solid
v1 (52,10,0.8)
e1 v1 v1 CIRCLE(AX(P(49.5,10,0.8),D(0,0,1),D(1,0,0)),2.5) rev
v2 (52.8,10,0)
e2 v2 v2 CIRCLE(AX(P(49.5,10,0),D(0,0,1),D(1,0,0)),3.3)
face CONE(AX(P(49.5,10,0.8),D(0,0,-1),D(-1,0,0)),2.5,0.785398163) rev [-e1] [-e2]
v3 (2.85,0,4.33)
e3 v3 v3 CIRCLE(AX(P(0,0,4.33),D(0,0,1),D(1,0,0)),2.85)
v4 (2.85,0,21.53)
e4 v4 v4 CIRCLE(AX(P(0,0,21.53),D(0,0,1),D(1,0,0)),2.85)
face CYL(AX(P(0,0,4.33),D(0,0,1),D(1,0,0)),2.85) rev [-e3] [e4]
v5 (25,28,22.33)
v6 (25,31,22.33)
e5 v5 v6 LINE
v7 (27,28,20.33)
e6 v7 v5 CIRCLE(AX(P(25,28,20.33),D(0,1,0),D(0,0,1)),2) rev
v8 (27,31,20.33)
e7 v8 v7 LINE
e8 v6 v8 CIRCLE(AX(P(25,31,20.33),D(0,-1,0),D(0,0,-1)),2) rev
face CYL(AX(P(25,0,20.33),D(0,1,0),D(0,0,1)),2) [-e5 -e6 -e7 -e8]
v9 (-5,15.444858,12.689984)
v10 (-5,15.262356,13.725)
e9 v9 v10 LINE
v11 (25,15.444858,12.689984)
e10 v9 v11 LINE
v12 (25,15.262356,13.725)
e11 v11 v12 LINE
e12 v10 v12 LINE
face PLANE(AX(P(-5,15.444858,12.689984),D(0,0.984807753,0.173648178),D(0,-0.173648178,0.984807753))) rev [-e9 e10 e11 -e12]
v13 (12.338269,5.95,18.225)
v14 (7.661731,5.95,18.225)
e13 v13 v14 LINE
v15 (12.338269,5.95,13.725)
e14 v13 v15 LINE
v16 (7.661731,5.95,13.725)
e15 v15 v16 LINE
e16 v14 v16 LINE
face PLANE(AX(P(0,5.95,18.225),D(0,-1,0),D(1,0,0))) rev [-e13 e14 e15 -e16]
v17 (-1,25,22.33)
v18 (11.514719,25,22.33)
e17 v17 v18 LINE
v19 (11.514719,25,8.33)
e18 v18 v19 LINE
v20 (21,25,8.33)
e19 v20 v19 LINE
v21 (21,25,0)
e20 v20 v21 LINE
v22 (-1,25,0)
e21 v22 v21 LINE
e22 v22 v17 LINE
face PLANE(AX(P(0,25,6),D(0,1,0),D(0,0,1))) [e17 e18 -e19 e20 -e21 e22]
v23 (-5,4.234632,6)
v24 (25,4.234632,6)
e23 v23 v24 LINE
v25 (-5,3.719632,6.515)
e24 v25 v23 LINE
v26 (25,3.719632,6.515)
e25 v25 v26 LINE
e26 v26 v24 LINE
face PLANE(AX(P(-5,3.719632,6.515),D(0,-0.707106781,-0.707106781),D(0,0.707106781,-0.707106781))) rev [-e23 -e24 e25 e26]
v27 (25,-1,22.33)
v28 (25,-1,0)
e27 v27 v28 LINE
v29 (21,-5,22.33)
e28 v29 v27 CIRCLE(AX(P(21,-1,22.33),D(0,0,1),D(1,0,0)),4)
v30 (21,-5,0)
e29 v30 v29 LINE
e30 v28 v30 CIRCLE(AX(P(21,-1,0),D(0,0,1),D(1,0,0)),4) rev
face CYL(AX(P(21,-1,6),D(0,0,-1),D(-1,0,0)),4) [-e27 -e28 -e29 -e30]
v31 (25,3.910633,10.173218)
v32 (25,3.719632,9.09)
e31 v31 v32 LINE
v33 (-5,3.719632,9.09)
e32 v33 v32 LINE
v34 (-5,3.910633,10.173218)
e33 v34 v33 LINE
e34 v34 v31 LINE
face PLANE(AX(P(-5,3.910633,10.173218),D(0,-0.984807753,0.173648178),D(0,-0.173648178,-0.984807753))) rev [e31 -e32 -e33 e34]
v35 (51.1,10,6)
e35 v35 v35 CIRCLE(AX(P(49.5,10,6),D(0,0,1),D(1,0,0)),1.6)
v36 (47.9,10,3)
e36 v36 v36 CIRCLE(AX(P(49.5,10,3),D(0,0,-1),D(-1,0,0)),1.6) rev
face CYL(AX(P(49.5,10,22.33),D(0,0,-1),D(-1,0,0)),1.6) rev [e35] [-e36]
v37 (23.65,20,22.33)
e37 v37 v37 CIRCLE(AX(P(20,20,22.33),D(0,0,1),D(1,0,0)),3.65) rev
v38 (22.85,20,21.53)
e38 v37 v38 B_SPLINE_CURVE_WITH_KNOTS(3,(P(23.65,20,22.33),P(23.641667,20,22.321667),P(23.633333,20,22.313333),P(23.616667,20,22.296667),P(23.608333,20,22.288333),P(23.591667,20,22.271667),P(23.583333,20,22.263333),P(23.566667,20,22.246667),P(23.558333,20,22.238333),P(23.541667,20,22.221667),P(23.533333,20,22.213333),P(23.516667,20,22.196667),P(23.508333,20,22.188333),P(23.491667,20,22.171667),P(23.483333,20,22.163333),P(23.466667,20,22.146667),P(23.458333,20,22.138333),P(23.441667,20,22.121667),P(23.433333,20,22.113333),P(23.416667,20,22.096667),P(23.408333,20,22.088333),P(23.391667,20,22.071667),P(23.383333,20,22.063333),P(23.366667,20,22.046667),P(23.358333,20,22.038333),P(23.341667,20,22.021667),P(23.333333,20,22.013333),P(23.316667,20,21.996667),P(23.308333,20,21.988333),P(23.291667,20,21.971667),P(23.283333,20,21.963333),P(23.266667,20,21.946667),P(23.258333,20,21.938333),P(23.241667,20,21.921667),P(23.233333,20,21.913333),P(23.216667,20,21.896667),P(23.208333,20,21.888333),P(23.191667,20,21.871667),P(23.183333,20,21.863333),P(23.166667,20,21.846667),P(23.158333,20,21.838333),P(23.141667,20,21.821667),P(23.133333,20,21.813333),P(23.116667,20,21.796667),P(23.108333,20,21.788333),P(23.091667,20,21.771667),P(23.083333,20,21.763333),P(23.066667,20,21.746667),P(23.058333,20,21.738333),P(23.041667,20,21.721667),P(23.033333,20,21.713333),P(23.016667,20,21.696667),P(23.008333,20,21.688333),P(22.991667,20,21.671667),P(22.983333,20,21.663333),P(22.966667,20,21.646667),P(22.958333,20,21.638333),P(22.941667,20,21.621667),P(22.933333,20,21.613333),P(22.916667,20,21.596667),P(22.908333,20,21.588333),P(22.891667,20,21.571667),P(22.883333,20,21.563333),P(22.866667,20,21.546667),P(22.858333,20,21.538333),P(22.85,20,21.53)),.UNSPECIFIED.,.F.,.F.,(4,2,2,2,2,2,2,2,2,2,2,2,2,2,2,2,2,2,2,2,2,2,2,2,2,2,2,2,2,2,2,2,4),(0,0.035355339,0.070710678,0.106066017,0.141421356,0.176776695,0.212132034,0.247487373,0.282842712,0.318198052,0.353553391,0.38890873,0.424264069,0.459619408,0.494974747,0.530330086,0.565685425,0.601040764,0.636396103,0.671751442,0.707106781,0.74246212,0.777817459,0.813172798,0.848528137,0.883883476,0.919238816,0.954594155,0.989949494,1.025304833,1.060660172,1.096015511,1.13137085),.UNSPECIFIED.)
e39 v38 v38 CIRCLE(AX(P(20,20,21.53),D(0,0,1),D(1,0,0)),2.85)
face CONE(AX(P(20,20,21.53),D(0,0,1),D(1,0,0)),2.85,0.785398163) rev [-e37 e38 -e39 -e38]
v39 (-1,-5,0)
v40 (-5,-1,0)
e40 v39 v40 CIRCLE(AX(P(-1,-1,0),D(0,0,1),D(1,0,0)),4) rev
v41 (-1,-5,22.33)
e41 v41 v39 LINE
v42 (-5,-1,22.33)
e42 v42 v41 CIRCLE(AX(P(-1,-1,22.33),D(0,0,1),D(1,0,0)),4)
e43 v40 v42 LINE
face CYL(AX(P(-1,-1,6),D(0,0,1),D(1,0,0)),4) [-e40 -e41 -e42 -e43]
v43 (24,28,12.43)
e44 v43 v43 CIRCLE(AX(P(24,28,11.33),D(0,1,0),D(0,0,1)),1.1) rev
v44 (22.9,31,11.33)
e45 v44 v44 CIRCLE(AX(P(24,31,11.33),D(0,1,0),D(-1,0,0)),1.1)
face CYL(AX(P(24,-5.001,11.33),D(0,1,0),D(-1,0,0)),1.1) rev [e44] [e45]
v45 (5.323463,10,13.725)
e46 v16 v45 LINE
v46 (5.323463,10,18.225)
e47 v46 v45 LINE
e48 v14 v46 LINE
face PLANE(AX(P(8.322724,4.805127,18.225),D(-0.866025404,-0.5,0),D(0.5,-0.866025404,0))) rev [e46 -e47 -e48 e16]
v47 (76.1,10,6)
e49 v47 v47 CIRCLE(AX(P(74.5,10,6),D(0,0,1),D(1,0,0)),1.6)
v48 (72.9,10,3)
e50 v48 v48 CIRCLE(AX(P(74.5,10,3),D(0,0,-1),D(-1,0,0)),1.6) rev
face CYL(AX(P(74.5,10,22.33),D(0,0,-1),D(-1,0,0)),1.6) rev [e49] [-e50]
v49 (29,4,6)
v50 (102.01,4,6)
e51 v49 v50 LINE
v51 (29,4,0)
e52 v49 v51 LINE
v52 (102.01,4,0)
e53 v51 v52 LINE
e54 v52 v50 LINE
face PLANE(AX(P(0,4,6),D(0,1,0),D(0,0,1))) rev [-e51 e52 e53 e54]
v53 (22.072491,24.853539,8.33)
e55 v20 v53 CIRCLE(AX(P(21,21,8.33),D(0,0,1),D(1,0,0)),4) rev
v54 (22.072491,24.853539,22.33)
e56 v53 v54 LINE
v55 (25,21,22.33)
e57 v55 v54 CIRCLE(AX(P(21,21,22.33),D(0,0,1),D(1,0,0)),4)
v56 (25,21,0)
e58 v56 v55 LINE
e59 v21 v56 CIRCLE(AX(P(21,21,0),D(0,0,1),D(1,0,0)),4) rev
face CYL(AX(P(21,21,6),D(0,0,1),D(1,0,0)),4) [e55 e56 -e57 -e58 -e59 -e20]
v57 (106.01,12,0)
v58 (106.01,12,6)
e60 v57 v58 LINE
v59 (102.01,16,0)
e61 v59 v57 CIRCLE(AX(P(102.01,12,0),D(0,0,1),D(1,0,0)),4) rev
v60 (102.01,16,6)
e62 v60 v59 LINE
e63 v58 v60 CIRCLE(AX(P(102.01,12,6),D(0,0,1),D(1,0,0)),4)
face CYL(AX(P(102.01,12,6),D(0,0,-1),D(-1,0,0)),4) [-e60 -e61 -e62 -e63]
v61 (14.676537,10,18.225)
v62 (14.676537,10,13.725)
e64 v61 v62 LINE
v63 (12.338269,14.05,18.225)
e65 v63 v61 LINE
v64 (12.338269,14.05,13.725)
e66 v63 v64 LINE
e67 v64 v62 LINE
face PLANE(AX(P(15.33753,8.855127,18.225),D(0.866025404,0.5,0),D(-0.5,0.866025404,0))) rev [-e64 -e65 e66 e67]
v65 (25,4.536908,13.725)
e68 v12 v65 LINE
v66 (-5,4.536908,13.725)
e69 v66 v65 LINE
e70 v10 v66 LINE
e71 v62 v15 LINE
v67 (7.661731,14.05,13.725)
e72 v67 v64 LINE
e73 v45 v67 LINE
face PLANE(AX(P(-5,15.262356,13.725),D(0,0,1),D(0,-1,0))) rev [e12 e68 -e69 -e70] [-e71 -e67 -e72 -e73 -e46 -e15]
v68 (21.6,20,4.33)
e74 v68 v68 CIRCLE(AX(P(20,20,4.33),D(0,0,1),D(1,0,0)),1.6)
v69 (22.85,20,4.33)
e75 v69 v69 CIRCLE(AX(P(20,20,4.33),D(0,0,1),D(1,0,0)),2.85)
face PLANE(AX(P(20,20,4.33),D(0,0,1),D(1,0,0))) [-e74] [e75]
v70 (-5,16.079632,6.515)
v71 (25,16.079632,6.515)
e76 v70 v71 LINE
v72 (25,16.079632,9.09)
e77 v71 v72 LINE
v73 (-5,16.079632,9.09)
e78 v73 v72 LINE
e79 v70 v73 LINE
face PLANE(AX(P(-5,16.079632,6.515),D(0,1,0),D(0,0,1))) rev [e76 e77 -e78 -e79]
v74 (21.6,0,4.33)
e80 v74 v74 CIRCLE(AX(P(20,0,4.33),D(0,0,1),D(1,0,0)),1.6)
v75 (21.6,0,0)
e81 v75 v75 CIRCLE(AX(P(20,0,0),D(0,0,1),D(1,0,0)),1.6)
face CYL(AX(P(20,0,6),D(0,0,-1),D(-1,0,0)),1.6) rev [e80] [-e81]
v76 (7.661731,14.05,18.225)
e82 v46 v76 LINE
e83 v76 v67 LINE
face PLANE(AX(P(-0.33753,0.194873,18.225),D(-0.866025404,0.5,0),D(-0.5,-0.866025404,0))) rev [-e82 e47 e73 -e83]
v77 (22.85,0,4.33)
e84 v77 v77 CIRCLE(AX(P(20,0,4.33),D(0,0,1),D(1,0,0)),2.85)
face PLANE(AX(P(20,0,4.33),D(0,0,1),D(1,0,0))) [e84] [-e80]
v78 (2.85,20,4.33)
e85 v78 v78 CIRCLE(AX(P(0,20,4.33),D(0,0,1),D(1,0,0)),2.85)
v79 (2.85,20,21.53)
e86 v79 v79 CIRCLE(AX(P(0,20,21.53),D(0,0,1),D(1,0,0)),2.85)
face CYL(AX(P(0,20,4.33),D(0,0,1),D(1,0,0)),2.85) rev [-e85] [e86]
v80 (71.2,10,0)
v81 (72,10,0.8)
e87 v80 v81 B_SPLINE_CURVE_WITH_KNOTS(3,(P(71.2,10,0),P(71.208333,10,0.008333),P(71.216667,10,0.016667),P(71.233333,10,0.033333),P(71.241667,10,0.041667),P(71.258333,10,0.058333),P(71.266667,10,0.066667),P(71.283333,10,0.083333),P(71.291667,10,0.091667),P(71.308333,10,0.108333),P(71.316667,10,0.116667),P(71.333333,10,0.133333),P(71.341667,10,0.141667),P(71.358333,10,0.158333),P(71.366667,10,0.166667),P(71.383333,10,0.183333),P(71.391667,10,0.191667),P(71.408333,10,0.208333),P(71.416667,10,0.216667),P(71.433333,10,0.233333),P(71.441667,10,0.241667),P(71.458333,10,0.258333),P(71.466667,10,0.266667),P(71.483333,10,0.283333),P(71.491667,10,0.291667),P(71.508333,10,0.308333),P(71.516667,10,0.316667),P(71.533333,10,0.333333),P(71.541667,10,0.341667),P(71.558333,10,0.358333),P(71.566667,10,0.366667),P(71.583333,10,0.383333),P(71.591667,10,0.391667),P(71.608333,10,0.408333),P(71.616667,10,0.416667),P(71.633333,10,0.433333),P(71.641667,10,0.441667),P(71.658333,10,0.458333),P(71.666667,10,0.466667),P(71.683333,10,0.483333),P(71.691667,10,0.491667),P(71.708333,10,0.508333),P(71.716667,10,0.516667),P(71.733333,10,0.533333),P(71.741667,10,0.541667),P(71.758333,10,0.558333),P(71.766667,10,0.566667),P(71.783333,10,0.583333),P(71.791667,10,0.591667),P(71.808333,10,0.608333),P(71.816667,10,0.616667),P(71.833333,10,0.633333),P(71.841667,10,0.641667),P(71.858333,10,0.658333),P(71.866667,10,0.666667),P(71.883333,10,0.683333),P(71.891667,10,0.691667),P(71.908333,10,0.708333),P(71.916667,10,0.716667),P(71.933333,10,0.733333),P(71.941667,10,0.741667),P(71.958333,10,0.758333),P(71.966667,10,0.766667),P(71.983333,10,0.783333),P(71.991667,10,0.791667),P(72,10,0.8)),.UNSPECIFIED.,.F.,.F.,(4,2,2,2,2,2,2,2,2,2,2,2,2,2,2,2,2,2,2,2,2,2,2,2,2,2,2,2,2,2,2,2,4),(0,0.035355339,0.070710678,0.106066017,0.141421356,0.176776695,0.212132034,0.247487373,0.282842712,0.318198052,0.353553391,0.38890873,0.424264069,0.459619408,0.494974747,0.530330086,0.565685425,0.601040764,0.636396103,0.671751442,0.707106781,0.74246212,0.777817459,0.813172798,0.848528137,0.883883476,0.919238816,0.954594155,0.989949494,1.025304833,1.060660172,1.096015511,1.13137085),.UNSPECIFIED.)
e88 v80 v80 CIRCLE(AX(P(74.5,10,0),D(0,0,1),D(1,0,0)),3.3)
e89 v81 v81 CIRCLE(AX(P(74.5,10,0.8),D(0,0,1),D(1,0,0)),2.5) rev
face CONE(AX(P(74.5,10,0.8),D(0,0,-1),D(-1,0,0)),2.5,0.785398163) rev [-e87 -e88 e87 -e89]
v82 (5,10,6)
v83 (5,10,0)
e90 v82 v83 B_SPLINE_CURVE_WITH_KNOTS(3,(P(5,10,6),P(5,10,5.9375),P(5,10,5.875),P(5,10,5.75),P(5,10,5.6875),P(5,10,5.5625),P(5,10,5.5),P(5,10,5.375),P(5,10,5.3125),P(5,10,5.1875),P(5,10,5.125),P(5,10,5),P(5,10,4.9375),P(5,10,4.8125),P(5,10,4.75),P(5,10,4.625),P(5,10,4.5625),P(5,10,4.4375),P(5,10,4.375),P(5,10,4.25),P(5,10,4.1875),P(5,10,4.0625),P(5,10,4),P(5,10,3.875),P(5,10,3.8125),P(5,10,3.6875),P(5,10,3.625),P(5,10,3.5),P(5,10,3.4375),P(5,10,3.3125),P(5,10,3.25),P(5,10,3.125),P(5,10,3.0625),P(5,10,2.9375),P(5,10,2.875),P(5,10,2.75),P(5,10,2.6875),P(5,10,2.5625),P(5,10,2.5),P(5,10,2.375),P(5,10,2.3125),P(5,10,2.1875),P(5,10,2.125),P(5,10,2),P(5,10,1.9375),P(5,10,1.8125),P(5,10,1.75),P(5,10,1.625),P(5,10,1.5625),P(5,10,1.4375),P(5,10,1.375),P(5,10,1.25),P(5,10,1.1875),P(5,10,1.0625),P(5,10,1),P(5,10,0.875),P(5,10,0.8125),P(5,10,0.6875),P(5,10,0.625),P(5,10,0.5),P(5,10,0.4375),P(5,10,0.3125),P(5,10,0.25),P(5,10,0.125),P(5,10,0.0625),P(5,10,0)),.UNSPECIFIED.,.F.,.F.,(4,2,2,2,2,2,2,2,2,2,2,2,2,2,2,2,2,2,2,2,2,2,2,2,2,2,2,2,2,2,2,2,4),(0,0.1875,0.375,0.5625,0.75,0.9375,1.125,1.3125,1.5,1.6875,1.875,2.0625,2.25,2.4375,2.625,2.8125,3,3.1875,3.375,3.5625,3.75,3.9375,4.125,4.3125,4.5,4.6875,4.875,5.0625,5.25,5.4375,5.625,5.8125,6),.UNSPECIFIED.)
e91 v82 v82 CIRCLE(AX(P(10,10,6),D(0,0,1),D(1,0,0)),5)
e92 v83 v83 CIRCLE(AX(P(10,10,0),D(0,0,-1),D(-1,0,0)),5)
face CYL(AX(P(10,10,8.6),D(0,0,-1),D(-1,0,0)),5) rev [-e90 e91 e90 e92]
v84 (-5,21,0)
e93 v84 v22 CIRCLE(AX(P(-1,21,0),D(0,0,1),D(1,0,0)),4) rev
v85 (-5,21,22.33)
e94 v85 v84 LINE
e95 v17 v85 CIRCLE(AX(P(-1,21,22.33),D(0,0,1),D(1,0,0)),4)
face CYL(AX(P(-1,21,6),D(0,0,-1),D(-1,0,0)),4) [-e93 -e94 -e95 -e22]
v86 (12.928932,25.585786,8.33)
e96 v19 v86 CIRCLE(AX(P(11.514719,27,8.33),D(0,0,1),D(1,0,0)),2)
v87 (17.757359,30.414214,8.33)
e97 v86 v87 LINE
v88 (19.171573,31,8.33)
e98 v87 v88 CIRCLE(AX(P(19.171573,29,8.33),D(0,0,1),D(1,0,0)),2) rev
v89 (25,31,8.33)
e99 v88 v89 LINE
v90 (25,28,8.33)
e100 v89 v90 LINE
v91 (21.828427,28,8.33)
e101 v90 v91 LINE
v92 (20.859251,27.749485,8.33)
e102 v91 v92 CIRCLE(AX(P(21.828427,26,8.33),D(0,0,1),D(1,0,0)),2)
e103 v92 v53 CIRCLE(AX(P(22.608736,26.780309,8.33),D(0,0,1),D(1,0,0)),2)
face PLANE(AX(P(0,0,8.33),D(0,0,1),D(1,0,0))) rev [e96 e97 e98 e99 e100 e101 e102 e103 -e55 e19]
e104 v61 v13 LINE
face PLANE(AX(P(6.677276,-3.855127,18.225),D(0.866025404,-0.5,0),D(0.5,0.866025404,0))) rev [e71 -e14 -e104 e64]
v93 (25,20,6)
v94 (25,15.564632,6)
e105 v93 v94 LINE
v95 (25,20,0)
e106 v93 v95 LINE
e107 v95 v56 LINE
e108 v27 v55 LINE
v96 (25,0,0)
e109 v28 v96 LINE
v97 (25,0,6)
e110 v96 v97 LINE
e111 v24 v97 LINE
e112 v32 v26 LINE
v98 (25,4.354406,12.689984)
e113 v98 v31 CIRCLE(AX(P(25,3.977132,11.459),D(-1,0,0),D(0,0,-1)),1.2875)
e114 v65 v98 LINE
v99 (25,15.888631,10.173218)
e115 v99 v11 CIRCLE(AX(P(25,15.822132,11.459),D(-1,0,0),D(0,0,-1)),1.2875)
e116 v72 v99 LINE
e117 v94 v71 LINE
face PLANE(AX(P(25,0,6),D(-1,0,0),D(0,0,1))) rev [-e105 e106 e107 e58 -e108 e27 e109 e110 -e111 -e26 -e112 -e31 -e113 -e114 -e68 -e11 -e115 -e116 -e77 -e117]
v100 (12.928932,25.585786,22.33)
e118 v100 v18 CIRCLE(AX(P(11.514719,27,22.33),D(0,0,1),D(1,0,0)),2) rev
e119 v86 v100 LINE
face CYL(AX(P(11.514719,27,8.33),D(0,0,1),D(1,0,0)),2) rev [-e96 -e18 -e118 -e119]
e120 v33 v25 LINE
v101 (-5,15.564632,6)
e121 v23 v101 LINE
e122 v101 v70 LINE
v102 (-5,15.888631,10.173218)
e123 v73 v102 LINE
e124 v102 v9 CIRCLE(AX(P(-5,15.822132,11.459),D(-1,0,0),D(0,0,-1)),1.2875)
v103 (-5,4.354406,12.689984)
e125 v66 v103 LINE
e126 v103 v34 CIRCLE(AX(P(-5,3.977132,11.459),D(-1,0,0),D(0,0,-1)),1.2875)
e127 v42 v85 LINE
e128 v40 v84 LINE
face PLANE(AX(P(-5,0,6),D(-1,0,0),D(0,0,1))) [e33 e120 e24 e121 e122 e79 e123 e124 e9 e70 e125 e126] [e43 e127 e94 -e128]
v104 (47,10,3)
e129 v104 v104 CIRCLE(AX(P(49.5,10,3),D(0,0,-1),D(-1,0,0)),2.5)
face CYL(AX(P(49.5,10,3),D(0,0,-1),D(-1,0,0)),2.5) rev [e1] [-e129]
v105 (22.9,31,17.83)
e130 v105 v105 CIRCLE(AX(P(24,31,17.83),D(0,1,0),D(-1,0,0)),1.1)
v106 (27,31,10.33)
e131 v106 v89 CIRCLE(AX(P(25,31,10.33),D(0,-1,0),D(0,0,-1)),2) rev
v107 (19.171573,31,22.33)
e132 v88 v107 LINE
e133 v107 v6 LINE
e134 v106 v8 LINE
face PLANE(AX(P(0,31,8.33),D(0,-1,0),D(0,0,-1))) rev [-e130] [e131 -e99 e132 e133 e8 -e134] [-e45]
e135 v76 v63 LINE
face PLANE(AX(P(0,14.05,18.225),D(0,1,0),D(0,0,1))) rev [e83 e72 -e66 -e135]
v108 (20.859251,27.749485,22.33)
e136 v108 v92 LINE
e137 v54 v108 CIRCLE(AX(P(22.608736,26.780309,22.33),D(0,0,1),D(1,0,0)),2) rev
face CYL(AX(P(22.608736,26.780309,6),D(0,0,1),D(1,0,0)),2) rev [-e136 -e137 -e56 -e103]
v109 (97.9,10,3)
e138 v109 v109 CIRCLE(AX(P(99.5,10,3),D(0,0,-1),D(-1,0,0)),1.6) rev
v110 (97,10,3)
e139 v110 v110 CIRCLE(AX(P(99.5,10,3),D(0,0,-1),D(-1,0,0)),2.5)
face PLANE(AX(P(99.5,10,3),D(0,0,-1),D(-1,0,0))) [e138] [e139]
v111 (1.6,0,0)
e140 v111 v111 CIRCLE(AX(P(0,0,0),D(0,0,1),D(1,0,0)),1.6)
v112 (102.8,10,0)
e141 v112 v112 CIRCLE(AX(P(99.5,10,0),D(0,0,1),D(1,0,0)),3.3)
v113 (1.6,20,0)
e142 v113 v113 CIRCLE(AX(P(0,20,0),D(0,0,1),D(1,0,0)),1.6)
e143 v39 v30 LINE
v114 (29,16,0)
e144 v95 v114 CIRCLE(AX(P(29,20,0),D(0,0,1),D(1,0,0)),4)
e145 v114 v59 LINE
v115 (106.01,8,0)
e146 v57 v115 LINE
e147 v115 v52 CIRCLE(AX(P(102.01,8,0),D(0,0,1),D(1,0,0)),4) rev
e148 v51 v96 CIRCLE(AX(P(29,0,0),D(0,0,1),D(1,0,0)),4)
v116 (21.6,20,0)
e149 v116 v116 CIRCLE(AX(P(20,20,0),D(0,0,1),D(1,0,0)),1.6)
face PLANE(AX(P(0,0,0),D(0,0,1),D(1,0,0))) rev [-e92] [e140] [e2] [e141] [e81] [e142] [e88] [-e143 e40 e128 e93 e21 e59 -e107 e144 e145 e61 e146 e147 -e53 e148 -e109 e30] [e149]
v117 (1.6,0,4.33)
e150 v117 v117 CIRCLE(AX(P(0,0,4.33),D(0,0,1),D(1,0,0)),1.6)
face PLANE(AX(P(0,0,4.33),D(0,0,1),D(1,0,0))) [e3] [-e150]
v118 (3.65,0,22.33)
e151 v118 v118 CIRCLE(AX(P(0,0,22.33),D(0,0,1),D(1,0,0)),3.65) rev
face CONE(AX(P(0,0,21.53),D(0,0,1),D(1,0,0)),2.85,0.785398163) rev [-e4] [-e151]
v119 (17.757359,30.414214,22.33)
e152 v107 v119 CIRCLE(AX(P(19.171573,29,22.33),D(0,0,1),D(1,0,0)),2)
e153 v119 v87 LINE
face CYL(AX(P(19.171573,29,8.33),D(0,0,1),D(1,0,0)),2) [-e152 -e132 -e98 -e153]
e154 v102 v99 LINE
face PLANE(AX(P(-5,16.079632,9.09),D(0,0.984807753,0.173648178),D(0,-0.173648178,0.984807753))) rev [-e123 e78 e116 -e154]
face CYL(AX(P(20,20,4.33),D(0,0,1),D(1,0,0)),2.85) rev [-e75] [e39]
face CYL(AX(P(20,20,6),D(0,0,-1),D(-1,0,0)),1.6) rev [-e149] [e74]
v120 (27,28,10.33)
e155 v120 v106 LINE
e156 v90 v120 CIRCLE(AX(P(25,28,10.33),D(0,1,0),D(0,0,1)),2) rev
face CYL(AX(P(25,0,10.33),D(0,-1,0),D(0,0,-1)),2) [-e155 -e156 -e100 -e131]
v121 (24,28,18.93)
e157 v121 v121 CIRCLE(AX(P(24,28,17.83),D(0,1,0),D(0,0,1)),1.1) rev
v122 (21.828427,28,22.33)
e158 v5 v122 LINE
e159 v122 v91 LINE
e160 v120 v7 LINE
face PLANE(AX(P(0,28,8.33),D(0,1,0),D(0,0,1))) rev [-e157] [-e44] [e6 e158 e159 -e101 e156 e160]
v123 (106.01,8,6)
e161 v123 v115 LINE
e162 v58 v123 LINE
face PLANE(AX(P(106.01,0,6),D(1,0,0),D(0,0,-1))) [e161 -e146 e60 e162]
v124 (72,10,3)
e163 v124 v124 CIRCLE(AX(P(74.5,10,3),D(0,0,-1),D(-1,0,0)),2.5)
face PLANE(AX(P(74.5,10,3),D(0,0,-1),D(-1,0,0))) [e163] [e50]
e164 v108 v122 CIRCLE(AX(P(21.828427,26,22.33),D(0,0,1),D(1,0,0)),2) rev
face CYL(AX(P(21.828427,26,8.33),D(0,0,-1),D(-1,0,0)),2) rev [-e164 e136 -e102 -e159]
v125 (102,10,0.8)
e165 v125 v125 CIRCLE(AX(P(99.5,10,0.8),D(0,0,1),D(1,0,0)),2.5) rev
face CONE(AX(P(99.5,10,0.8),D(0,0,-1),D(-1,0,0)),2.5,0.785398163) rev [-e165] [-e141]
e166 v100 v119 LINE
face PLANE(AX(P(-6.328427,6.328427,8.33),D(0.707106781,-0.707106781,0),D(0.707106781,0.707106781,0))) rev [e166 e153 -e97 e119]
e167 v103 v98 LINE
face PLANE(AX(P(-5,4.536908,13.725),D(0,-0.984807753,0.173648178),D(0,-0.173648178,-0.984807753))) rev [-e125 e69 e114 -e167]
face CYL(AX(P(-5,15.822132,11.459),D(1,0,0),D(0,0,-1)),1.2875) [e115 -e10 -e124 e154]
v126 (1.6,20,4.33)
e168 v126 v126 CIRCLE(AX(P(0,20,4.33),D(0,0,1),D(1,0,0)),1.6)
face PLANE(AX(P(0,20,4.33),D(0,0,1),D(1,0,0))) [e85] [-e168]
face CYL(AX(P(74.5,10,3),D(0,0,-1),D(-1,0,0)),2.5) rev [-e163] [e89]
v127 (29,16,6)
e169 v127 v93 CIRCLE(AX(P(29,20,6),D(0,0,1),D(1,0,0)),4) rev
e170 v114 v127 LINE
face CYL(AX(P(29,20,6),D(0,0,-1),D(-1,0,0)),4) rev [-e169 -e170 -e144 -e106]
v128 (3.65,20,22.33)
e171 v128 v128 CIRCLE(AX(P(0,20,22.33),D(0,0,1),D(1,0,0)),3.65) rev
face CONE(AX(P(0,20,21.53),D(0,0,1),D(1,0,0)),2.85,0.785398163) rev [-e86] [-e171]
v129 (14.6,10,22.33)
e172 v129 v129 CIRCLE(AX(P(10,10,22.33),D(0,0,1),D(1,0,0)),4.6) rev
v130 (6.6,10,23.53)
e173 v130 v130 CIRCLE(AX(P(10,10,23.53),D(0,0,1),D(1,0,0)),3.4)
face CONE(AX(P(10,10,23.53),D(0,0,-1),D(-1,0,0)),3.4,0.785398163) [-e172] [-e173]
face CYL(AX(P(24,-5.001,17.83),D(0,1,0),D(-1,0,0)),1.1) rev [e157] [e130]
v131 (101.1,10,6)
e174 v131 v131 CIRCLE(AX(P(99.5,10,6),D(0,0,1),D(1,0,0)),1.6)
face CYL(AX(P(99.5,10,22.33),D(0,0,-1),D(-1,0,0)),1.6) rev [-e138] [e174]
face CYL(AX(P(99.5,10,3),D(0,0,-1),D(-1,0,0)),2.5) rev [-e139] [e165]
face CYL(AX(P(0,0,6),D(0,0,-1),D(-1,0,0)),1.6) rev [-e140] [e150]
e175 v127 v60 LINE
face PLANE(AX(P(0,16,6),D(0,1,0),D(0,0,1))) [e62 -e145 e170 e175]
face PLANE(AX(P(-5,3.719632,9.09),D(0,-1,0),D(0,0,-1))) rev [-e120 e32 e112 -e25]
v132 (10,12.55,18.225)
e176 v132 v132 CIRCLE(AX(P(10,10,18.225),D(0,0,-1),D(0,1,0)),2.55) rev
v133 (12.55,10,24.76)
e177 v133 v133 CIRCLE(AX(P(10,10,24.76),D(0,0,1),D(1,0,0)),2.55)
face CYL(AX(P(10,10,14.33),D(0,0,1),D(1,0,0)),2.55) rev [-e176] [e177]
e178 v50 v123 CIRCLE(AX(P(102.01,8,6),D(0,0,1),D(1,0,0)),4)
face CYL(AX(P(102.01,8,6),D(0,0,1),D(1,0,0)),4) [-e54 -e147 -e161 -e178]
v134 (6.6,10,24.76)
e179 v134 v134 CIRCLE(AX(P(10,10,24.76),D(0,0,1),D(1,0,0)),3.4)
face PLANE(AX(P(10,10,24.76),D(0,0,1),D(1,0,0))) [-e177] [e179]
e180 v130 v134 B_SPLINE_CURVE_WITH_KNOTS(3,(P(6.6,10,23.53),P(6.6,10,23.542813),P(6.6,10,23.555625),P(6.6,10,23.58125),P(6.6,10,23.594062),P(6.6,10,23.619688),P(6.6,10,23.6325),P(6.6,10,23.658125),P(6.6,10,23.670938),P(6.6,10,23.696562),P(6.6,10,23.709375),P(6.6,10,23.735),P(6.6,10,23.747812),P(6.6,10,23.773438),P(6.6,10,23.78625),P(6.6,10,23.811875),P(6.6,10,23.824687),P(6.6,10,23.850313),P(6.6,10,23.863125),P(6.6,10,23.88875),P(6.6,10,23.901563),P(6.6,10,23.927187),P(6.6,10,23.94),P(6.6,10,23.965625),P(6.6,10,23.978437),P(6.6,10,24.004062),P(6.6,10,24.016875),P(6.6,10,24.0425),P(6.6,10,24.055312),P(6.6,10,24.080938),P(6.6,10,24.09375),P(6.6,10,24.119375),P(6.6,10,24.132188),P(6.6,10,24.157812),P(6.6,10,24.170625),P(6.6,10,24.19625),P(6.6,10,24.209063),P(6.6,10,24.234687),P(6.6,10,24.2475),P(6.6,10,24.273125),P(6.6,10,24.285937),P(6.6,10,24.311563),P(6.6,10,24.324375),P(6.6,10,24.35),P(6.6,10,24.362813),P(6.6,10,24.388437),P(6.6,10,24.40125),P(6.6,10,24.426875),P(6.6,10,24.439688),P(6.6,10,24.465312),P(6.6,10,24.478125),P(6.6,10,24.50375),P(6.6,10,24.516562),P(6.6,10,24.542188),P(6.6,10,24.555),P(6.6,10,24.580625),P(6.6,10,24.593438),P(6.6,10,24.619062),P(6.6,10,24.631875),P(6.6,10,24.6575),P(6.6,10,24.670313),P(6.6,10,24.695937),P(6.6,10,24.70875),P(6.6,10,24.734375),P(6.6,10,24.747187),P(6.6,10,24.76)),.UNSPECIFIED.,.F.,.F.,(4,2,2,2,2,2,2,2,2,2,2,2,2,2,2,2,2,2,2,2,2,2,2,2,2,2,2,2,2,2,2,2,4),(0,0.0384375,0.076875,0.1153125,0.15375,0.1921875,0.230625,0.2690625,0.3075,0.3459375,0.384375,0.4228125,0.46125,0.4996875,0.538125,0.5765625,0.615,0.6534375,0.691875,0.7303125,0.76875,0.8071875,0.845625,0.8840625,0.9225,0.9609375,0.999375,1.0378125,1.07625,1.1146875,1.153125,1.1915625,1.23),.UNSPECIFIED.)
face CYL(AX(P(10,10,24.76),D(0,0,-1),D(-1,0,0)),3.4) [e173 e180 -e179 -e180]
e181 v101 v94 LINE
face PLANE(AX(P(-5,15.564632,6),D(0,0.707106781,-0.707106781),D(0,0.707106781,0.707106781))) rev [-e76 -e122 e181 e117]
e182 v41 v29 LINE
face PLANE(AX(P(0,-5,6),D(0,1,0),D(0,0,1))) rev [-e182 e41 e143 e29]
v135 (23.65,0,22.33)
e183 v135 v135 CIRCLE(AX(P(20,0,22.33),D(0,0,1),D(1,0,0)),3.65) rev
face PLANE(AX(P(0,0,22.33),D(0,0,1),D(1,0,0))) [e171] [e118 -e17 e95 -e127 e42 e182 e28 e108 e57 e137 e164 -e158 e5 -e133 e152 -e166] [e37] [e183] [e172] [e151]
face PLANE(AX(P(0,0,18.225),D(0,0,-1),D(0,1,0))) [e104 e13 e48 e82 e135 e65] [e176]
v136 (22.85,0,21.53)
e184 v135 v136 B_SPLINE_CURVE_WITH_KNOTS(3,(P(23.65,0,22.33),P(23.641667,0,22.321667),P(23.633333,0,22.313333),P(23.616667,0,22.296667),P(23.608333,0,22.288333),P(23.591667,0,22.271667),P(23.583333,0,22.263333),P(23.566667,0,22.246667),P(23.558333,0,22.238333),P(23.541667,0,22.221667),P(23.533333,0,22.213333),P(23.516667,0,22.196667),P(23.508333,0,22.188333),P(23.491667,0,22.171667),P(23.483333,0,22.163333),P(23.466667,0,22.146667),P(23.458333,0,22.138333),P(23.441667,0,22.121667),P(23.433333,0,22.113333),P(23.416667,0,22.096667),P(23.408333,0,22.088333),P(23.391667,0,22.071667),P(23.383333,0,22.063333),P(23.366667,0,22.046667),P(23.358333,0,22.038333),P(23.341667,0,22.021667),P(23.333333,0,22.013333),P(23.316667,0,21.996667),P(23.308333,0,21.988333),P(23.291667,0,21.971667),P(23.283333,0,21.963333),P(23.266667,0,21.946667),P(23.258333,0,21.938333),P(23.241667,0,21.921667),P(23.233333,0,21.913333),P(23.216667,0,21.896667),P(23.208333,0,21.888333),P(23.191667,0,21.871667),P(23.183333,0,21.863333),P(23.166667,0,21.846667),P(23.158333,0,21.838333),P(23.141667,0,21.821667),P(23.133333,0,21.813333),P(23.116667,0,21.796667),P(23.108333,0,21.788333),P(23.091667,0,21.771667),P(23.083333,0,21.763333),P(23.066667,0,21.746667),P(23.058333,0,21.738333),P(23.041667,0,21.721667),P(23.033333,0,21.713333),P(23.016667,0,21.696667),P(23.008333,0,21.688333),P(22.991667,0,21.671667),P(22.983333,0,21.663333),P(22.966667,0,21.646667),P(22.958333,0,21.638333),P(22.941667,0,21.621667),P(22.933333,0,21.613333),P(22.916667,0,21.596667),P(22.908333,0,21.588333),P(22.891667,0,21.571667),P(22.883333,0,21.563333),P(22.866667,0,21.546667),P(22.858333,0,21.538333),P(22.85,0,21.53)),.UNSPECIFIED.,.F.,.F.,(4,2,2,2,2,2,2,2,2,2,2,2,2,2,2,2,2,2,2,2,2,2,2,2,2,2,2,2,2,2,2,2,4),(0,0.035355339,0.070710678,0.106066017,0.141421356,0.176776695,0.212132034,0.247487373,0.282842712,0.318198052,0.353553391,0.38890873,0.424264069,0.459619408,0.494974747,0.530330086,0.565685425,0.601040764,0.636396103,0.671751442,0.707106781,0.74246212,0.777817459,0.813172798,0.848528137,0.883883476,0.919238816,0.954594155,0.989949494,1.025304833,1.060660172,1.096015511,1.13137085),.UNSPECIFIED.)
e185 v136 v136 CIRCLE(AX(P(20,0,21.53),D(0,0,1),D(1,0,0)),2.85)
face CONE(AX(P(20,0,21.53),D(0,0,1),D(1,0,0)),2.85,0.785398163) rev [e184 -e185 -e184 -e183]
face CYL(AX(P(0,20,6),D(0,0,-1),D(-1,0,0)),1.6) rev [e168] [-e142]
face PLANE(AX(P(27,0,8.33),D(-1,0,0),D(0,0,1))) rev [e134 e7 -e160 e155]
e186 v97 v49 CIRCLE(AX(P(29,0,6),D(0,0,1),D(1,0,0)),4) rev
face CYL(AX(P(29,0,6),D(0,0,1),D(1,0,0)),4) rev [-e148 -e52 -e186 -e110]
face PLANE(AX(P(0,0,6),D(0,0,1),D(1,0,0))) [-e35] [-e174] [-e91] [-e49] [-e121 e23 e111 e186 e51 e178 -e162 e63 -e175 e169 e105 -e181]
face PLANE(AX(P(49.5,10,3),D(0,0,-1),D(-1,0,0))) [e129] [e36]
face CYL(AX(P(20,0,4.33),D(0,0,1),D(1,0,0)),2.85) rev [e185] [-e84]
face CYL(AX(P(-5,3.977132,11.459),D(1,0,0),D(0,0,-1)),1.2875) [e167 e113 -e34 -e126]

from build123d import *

# Parameters (mm, degrees)
SKETCH1_W           = 30
SKETCH1_H           = 30
SKETCH1_R           = 1.6
SKETCH1_W_2         = 81.01
SKETCH1_H_2         = 12
BOSS_EXTRUDE1_DEPTH = 6
SKETCH1_3_W         = 30
SKETCH1_3_H         = 30
SKETCH1_3_R         = 1.6
BOSS_EXTRUDE2_DEPTH = 22.33
CUT_EXTRUDE1_DEPTH  = 88.671255266
SKETCH3_R           = 2.55
CUT_EXTRUDE2_DEPTH  = 8
CUT_EXTRUDE3_DEPTH  = 4.5
SKETCH6_R           = 5
CUT_EXTRUDE5_DEPTH  = 8.6
SKETCH7_R           = 1.6
CUT_EXTRUDE6_DEPTH  = 112.183402538
SKETCH8_R           = 2.85
CUT_EXTRUDE7_DEPTH  = 18
BOSS_EXTRUDE3_START = 2.43
SKETCH9_R           = 3.4
SKETCH9_R_2         = 2.55
BOSS_EXTRUDE3_DEPTH = 2.43
CHAMFER1_SIZE       = 1.2
FILLET3_R           = 4
CHAMFER2_SIZE       = 0.8
SKETCH10_R          = 2.5
CUT_EXTRUDE8_DEPTH  = 3
CHAMFER3_SIZE       = 0.8
BOSS_EXTRUDE6_DEPTH = 14
CUT_EXTRUDE10_REACH = 116.661
SKETCH17_R          = 1.1
FILLET5_R           = 2


with BuildPart() as part:
    # Sketch1 → Boss-Extrude1 (new body)
    # profile 1 of 2: a face of its own
    with BuildSketch(Plane.XY):
        with Locations((10, 10)):
            Rectangle(SKETCH1_W, SKETCH1_H)
        with Locations((20, 0)):
            Circle(SKETCH1_R, mode=Mode.SUBTRACT)
        with Locations((20, 20)):
            Circle(SKETCH1_R, mode=Mode.SUBTRACT)
        with Locations((0, 20)):
            Circle(SKETCH1_R, mode=Mode.SUBTRACT)
        Circle(SKETCH1_R, mode=Mode.SUBTRACT)
    # profile 2 of 2: a face of its own
    with BuildSketch(Plane.XY):
        with Locations((65.505, 10)):
            Rectangle(SKETCH1_W_2, SKETCH1_H_2)
    extrude(amount=BOSS_EXTRUDE1_DEPTH)

    # Sketch1<3> → Boss-Extrude2 (add)
    with BuildSketch(Plane.XY):
        with Locations((10, 10)):
            Rectangle(SKETCH1_3_W, SKETCH1_3_H)
        with Locations((20, 0)):
            Circle(SKETCH1_3_R, mode=Mode.SUBTRACT)
        with Locations((20, 20)):
            Circle(SKETCH1_3_R, mode=Mode.SUBTRACT)
        with Locations((0, 20)):
            Circle(SKETCH1_3_R, mode=Mode.SUBTRACT)
        Circle(SKETCH1_3_R, mode=Mode.SUBTRACT)
    extrude(amount=BOSS_EXTRUDE2_DEPTH)

    # Sketch2 → Cut-Extrude1 (cut, through all)
    with BuildSketch(Plane(origin=(25, 0, 0), x_dir=(0, 0, -1), z_dir=(1, 0, 0))):
        with BuildLine():
            Line((-6.515, 16.079632043), (-9.09, 16.079632043))
            Line((-9.09, 16.079632043), (-10.173218492, 15.888631397))
            ThreePointArc((-10.173218492, 15.888631397), (-11.235427971, 14.554192061), (-12.689983513, 15.444857819))
            Line((-12.689983513, 15.444857819), (-13.725, 15.262356487))
            Line((-13.725, 15.262356487), (-13.725, 4.536907598))
            Line((-13.725, 4.536907598), (-12.689983513, 4.354406266))
            ThreePointArc((-12.689983513, 4.354406266), (-11.235427971, 5.245072025), (-10.173218492, 3.910632689))
            Line((-10.173218492, 3.910632689), (-9.09, 3.719632043))
            Line((-9.09, 3.719632043), (-6.515, 3.719632043))
            Line((-6.515, 3.719632043), (-6, 4.234632043))
            Line((-6, 4.234632043), (-6, 15.564632043))
            Line((-6, 15.564632043), (-6.515, 16.079632043))
        make_face()
    extrude(amount=-CUT_EXTRUDE1_DEPTH, mode=Mode.SUBTRACT)

    # Sketch3 → Cut-Extrude2 (cut)
    with BuildSketch(Plane.XY.offset(22.33)):
        with Locations((10, 10)):
            Circle(SKETCH3_R)
    extrude(amount=-CUT_EXTRUDE2_DEPTH, mode=Mode.SUBTRACT)

    # Sketch5 → Cut-Extrude3 (cut)
    with BuildSketch(Plane(origin=(0, 0, 13.725), x_dir=(-1, 0, 0), z_dir=(0, 0, -1))):
        Polygon((-5.32346282, 10), (-7.66173141, 14.05), (-12.33826859, 14.05), (-14.67653718, 10), (-12.33826859, 5.95), (-7.66173141, 5.95), align=None)
    extrude(amount=-CUT_EXTRUDE3_DEPTH, mode=Mode.SUBTRACT)

    # Sketch6 → Cut-Extrude5 (cut)
    with BuildSketch(Plane(origin=(0, 0, 0), x_dir=(-1, 0, 0), z_dir=(0, 0, -1))):
        with Locations((-10, 10)):
            Circle(SKETCH6_R)
    extrude(amount=-CUT_EXTRUDE5_DEPTH, mode=Mode.SUBTRACT)

    # Sketch7 → Cut-Extrude6 (cut, through all)
    with BuildSketch(Plane(origin=(0, 0, 0), x_dir=(-1, 0, 0), z_dir=(0, 0, -1))):
        with BuildLine():
            ThreePointArc((-101.1, 10), (-99.5, 8.4), (-97.9, 10))
            Line((-97.9, 10), (-101.1, 10))
        make_face()
        with BuildLine():
            Line((-101.1, 10), (-97.9, 10))
            ThreePointArc((-97.9, 10), (-99.5, 11.6), (-101.1, 10))
        make_face()
        with Locations((-74.5, 10)):
            Circle(SKETCH7_R)
        with Locations((-49.5, 10)):
            Circle(SKETCH7_R)
    extrude(amount=-CUT_EXTRUDE6_DEPTH, mode=Mode.SUBTRACT)

    # Sketch8 → Cut-Extrude7 (cut)
    with BuildSketch(Plane.XY.offset(22.33)):
        with Locations((20, 20)):
            Circle(SKETCH8_R)
        with Locations((20, 0)):
            Circle(SKETCH8_R)
        Circle(SKETCH8_R)
        with Locations((0, 20)):
            Circle(SKETCH8_R)
    extrude(amount=-CUT_EXTRUDE7_DEPTH, mode=Mode.SUBTRACT)

    # Sketch9 → Boss-Extrude3 (add)
    with BuildSketch(Plane.XY.offset(22.33).offset(BOSS_EXTRUDE3_START)):
        with Locations(Location((10, 10, 0), (0, 0, 180))):
            Circle(SKETCH9_R)
        with Locations((10, 10)):
            Circle(SKETCH9_R_2, mode=Mode.SUBTRACT)
    extrude(amount=-BOSS_EXTRUDE3_DEPTH)

    # Chamfer1
    chamfer1_edges = [part.edges().sort_by_distance(p)[0] for p in [
        (13.4, 10, 22.33),
    ]]
    chamfer(chamfer1_edges, length=CHAMFER1_SIZE)

    # Fillet3
    fillet3_edges = [part.edges().sort_by_distance(p)[0] for p in [
        (-5, -5, 11.165),
        (-5, 25, 11.165),
        (25, 25, 11.165),
        (25, 16, 3),
        (106.01, 16, 3),
        (106.01, 4, 3),
        (25, 4, 3),
        (25, -5, 11.165),
    ]]
    fillet(fillet3_edges, radius=FILLET3_R)

    # Chamfer2
    chamfer2_edges = [part.edges().sort_by_distance(p)[0] for p in [
        (-2.85, 20, 22.33),
        (-2.85, 0, 22.33),
        (17.15, 0, 22.33),
        (17.15, 20, 22.33),
    ]]
    chamfer(chamfer2_edges, length=CHAMFER2_SIZE)

    # Sketch10 → Cut-Extrude8 (cut)
    with BuildSketch(Plane(origin=(0, 0, 0), x_dir=(-1, 0, 0), z_dir=(0, 0, -1))):
        with Locations((-99.5, 10)):
            Circle(SKETCH10_R)
        with Locations((-74.5, 10)):
            Circle(SKETCH10_R)
        with Locations((-49.5, 10)):
            Circle(SKETCH10_R)
    extrude(amount=-CUT_EXTRUDE8_DEPTH, mode=Mode.SUBTRACT)

    # Chamfer3
    chamfer3_edges = [part.edges().sort_by_distance(p)[0] for p in [
        (102, 10, 0),
        (77, 10, 0),
        (52, 10, 0),
    ]]
    chamfer(chamfer3_edges, length=CHAMFER3_SIZE)

    # Sketch15 → Boss-Extrude6 (add)
    with BuildSketch(Plane.XY.offset(22.33)):
        Polygon((18.343145751, 31), (12.343145751, 25), (18, 25), (21, 28), (27, 28), (27, 31), align=None)
    extrude(amount=-BOSS_EXTRUDE6_DEPTH)

    # Sketch17 → Cut-Extrude10 (cut, up to next)
    with BuildSketch(Plane(origin=(0, 31, 0), x_dir=(1, 0, 0), z_dir=(0, 1, 0)), mode=Mode.PRIVATE) as cut_extrude10_sk1:
        with Locations(Location((24, -11.33, 0), (0, 0, 180))):
            Circle(SKETCH17_R)
    cut_extrude10_tool1 = extrude(cut_extrude10_sk1.sketch, amount=-CUT_EXTRUDE10_REACH, mode=Mode.PRIVATE) & part.part
    # Sketch17 → Cut-Extrude10 (cut, up to next)
    with BuildSketch(Plane(origin=(0, 31, 0), x_dir=(1, 0, 0), z_dir=(0, 1, 0)), mode=Mode.PRIVATE) as cut_extrude10_sk2:
        with Locations(Location((24, -17.83, 0), (0, 0, 180))):
            Circle(SKETCH17_R)
    cut_extrude10_tool2 = extrude(cut_extrude10_sk2.sketch, amount=-CUT_EXTRUDE10_REACH, mode=Mode.PRIVATE) & part.part
    add(cut_extrude10_tool1.solids().sort_by_distance((24, 31, 11.33))[0], mode=Mode.SUBTRACT)
    add(cut_extrude10_tool2.solids().sort_by_distance((24, 31, 17.83))[0], mode=Mode.SUBTRACT)

    # Fillet5
    # the kernel refuses this fillet: 2 mm, written as the material it adds along each edge
    with BuildSketch(Plane(origin=(21, 28, 22.33), x_dir=(-0.7071067811865475, -0.7071067811865475, 0), z_dir=(0, 0, -1))) as fillet5_piece_1:
        with BuildLine():
            CenterArc((FILLET5_R * 0.414213562373, -FILLET5_R), FILLET5_R, 90, 45)
            Line((-FILLET5_R * 0.292893218813, -FILLET5_R * 0.292893218813), (0, 0))
            Line((0, 0), (FILLET5_R * 0.414213562373, 0))
        make_face()
    extrude(amount=14)
    with BuildSketch(Plane(origin=(12.343145751, 25, 22.33), x_dir=(-1, 0, 0), z_dir=(0, 0, -1))) as fillet5_piece_2:
        with BuildLine():
            CenterArc((FILLET5_R * 0.414213562373, FILLET5_R), FILLET5_R, 225, 45)
            Line((-FILLET5_R * 0.292893218813, FILLET5_R * 0.292893218813), (0, 0))
            Line((0, 0), (FILLET5_R * 0.414213562373, 0))
        make_face()
    extrude(amount=14)
    with BuildSketch(Plane(origin=(18, 25, 22.33), x_dir=(0.9993539414176275, -0.03594022500003582, 0), z_dir=(0, 0, -1))) as fillet5_piece_3:
        with BuildLine():
            CenterArc((4.541773641, -1.944797545), FILLET5_R, 103.492916805, 119.447416414)
            Line((3.07764659, -3.307270289), (2.931233885, -3.443517564))
            Line((2.931233885, -3.443517564), (-0.146412705, -0.136247274))
            Line((-0.146412705, -0.136247274), (0.007188045, 0.199870788))
            ThreePointArc((0.007188045, 0.199870788), (3.005249869, 0.092050113), (4.028458305, 0.194479755))
            Line((4.028458305, 0.194479755), (4.075123335, 0))
        make_face()
    extrude(amount=14)
    # the kernel refuses this fillet: 2 mm, written as the material it takes off along each edge
    with BuildSketch(Plane(origin=(27, 23, 22.33), x_dir=(-1, 0, 0), z_dir=(0, 1, 0))) as fillet5_2_piece_1:
        with BuildLine():
            CenterArc((FILLET5_R, -FILLET5_R), FILLET5_R, 90, 90)
            Line((0, -FILLET5_R), (0, 0))
            Line((0, 0), (FILLET5_R, 0))
        make_face()
    extrude(amount=13, mode=Mode.SUBTRACT)
    with BuildSketch(Plane(origin=(27, 23, 8.33), x_dir=(-1, 0, 0), z_dir=(0, 1, 0))) as fillet5_2_piece_2:
        with BuildLine():
            CenterArc((FILLET5_R, FILLET5_R), FILLET5_R, 180, 90)
            Line((0, FILLET5_R), (0, 0))
            Line((0, 0), (FILLET5_R, 0))
        make_face()
    extrude(amount=13, mode=Mode.SUBTRACT)
    with BuildSketch(Plane(origin=(18.343145751, 31, 24.401067812), x_dir=(-0.7071067811865476, -0.7071067811865476, 0), z_dir=(0, 0, -1))) as fillet5_2_piece_3:
        with BuildLine():
            CenterArc((FILLET5_R * 0.414213562373, -FILLET5_R), FILLET5_R, 90, 45)
            Line((-FILLET5_R * 0.292893218813, -FILLET5_R * 0.292893218813), (0, 0))
            Line((0, 0), (FILLET5_R * 0.414213562373, 0))
        make_face()
    extrude(amount=18.142135624, mode=Mode.SUBTRACT)


solid = part.part
